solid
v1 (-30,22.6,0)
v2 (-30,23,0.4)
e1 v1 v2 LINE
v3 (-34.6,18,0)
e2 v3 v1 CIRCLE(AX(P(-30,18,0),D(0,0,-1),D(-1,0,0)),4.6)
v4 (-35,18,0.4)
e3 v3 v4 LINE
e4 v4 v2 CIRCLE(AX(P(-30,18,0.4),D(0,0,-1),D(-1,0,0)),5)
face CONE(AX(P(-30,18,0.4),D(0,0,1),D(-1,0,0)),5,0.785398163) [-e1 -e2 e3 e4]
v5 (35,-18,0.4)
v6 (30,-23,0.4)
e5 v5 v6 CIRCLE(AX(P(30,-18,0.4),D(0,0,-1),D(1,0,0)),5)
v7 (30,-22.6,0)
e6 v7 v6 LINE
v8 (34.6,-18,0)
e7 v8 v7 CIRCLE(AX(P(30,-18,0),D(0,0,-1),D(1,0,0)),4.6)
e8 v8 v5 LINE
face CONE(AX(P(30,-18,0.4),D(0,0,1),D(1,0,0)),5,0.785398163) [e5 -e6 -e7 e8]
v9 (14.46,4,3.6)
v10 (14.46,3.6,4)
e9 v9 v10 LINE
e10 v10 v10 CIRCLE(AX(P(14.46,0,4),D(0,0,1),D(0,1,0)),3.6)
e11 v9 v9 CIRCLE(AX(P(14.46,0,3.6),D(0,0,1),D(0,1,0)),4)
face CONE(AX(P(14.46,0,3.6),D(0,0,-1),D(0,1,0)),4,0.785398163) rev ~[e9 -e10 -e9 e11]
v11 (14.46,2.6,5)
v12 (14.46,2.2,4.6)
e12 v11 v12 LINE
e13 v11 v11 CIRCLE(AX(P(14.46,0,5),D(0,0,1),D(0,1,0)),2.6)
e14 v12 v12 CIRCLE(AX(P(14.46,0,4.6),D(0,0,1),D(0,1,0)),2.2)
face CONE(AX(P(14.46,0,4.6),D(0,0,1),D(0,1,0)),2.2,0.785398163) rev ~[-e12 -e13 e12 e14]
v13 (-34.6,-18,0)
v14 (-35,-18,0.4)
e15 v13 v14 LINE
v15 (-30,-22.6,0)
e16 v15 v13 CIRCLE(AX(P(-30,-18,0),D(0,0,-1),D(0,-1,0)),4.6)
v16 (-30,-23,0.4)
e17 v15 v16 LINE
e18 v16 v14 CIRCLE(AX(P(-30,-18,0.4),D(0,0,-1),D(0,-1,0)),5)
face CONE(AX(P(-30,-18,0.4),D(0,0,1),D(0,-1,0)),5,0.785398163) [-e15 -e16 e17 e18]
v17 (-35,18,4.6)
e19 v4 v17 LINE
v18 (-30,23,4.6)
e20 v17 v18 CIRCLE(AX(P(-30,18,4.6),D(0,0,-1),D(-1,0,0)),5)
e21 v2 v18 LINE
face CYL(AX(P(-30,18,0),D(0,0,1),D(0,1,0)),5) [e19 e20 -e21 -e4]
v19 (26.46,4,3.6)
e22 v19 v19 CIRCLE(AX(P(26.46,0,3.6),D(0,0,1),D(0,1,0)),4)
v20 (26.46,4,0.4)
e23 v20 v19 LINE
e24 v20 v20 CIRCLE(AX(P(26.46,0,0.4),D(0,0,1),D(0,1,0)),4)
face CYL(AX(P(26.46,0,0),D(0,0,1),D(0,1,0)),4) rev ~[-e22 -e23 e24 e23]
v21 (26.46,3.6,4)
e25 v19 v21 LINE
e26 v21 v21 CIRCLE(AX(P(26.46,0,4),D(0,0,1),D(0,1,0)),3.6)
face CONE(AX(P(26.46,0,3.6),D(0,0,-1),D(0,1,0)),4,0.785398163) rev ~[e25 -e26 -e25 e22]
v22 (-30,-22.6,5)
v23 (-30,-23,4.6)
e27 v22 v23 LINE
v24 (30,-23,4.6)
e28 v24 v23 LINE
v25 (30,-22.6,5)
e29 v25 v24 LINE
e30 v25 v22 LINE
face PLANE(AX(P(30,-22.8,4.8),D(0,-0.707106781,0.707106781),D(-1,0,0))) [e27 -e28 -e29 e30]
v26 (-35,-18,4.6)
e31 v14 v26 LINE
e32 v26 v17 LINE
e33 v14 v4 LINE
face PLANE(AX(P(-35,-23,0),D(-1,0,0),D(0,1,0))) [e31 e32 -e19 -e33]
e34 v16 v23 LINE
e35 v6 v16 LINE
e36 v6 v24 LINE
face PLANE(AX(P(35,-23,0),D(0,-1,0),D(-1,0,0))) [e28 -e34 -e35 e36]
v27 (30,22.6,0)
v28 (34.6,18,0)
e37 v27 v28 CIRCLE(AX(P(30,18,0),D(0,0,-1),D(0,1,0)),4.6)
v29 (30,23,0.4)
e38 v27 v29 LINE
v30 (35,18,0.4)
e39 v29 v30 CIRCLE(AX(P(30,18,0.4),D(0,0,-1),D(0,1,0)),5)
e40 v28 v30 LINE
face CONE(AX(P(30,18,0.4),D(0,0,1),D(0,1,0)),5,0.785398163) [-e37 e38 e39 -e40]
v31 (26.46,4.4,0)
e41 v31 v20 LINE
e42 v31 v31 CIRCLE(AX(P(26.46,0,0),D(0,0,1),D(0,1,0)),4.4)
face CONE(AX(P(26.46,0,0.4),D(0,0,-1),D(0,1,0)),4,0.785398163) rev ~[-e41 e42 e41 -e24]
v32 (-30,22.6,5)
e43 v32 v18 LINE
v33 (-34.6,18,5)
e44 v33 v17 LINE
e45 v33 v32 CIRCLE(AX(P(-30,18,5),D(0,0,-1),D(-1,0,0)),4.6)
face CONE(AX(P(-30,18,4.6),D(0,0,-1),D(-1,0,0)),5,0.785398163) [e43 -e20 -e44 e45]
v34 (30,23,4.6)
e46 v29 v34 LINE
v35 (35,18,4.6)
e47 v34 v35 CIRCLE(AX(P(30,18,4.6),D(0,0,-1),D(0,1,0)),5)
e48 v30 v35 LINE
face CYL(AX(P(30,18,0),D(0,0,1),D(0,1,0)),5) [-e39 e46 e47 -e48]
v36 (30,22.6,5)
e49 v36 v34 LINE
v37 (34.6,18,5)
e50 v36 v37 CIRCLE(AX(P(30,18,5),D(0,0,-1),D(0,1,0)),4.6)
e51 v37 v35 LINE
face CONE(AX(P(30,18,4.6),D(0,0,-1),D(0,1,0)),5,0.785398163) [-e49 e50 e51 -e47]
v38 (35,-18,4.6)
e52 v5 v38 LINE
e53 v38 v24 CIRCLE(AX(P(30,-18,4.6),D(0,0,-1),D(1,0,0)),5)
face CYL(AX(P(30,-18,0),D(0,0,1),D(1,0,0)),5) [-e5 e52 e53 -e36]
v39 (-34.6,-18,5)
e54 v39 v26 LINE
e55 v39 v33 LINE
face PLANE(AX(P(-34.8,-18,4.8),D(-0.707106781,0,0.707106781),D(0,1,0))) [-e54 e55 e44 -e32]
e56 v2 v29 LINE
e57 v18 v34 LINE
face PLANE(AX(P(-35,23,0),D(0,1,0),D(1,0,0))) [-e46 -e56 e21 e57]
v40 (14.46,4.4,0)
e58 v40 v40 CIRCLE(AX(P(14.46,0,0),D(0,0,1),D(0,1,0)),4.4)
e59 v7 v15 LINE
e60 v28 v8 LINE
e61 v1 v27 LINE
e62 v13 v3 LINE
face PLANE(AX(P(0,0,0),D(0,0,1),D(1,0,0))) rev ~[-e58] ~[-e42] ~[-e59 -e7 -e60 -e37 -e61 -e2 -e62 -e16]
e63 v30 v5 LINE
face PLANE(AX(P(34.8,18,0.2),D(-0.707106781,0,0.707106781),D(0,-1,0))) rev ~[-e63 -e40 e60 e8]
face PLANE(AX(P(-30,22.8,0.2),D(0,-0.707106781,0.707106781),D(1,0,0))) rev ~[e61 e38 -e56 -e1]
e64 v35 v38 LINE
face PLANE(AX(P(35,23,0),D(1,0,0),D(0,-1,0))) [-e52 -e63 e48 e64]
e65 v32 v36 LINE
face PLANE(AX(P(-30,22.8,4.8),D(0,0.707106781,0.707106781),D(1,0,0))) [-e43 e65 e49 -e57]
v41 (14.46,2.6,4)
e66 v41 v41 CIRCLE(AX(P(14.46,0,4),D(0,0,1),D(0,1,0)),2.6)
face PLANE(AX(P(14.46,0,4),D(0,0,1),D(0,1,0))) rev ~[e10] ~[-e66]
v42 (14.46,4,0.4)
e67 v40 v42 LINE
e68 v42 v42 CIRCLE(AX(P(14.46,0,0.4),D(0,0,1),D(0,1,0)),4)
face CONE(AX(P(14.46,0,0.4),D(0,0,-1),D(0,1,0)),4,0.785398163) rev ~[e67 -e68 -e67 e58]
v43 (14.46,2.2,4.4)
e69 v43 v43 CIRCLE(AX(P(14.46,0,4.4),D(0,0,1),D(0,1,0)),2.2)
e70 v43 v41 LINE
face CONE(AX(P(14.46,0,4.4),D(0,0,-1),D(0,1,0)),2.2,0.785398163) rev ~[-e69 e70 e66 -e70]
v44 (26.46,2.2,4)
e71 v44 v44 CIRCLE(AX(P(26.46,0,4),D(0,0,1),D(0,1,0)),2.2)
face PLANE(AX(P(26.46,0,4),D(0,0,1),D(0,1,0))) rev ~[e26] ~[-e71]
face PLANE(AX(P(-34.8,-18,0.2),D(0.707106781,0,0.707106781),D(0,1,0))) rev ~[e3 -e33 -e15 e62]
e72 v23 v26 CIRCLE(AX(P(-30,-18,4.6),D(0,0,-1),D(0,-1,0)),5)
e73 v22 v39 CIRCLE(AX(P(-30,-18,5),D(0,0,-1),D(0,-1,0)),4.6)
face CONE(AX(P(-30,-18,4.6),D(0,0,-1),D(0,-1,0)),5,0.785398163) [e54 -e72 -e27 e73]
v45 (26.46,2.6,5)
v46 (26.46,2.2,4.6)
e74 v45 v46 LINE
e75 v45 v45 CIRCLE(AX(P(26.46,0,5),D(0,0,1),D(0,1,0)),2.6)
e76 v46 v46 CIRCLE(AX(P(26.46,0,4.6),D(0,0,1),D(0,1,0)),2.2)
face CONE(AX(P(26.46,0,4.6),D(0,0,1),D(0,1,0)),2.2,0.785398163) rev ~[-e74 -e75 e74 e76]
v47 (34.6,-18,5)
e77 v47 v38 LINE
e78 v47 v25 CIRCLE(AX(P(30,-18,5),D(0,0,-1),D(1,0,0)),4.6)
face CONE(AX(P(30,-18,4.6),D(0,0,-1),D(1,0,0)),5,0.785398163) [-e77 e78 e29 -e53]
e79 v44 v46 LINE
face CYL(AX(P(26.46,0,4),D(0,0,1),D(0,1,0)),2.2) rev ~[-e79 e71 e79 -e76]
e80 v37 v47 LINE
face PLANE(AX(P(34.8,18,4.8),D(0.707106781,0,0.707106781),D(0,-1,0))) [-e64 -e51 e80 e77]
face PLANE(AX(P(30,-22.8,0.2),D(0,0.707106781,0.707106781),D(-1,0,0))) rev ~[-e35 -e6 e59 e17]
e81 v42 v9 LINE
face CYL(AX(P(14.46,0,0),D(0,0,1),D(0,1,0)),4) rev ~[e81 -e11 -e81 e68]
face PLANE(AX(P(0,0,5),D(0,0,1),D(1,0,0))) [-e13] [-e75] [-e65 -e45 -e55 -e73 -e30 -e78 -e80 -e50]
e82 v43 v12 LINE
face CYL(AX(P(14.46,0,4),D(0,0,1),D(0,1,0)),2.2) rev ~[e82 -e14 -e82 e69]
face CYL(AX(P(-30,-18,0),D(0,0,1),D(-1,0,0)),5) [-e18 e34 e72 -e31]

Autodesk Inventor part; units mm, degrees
ref_plane "YZ Plane" through (0, 0, 0) normal (1, 0, 0) x (0, 1, 0)
ref_plane "XZ Plane" through (0, 0, 0) normal (0, 1, 0) x (-1, 0, 0)
ref_plane "XY Plane" through (0, 0, 0) normal (0, 0, 1) x (1, 0, 0)
sketch "Sketch1" plane through (0, 0, 0) normal (0, 0, 1) x (1, 0, 0)
  line L0 (-35, 23) -> (35, 23)
  line L1 (35, 23) -> (35, -23)
  line L2 (35, -23) -> (-35, -23)
  line L3 (-35, -23) -> (-35, 23)
  point P0 (0, 0)
  point P1 (0, 23)
  point P2 (35, 0)
  dimension "d0" = 46
  dimension "d1" = 70
extrude "Extrusion1" add sketch "Sketch1" along normal blind 5
sketch "Sketch3" plane through (0, 0, 0) normal (0, 0, -1) x (-1, 0, 0)
  line L0 (-26.46, 0) -> (-14.46, 0) construction
  line L1 (-35, -23) -> (-35, 23) projected
  point P0 (0, 0)
  dimension "d7" = 12
  dimension "d8" = 8.54
hole "Hole1" at (14.46, 0, 0) at (26.46, 0, 0) direction (0, 0, 1) diameter 4.4 end through all counterbore diameter 8 counterbore depth 4
fillet "Fillet1" radius 5 4 edges at (35, -23, 2.5) (35, 23, 2.5) (-35, 23, 2.5) (-35, -23, 2.5)
chamfer "Chamfer2" distance 0.4 angle 45 23 edges at (0, -23, 5) (33.5355, -21.5355, 5) (35, 0, 5) (33.5355, 21.5355, 5) (0, 23, 5) (-33.5355, 21.5355, 5) (-35, 0, 5) (-33.5355, -21.5355, 5) (0, -23, 0) (33.5355, -21.5355, 0) (35, 0, 0) (33.5355, 21.5355, 0) (0, 23, 0) (-33.5355, 21.5355, 0) (-35, 0, 0) (-33.5355, -21.5355, 0) (14.46, -4, 0) (26.46, -4, 0) (26.46, -2.2, 5) (14.46, -2.2, 5) (14.46, -2.2, 4) (14.46, -4, 4) (26.46, -4, 4)
equation "\"d2\" = thickness"
equation "\"thickness\" = 5"
properties part number "Takumar-foot-flat"
